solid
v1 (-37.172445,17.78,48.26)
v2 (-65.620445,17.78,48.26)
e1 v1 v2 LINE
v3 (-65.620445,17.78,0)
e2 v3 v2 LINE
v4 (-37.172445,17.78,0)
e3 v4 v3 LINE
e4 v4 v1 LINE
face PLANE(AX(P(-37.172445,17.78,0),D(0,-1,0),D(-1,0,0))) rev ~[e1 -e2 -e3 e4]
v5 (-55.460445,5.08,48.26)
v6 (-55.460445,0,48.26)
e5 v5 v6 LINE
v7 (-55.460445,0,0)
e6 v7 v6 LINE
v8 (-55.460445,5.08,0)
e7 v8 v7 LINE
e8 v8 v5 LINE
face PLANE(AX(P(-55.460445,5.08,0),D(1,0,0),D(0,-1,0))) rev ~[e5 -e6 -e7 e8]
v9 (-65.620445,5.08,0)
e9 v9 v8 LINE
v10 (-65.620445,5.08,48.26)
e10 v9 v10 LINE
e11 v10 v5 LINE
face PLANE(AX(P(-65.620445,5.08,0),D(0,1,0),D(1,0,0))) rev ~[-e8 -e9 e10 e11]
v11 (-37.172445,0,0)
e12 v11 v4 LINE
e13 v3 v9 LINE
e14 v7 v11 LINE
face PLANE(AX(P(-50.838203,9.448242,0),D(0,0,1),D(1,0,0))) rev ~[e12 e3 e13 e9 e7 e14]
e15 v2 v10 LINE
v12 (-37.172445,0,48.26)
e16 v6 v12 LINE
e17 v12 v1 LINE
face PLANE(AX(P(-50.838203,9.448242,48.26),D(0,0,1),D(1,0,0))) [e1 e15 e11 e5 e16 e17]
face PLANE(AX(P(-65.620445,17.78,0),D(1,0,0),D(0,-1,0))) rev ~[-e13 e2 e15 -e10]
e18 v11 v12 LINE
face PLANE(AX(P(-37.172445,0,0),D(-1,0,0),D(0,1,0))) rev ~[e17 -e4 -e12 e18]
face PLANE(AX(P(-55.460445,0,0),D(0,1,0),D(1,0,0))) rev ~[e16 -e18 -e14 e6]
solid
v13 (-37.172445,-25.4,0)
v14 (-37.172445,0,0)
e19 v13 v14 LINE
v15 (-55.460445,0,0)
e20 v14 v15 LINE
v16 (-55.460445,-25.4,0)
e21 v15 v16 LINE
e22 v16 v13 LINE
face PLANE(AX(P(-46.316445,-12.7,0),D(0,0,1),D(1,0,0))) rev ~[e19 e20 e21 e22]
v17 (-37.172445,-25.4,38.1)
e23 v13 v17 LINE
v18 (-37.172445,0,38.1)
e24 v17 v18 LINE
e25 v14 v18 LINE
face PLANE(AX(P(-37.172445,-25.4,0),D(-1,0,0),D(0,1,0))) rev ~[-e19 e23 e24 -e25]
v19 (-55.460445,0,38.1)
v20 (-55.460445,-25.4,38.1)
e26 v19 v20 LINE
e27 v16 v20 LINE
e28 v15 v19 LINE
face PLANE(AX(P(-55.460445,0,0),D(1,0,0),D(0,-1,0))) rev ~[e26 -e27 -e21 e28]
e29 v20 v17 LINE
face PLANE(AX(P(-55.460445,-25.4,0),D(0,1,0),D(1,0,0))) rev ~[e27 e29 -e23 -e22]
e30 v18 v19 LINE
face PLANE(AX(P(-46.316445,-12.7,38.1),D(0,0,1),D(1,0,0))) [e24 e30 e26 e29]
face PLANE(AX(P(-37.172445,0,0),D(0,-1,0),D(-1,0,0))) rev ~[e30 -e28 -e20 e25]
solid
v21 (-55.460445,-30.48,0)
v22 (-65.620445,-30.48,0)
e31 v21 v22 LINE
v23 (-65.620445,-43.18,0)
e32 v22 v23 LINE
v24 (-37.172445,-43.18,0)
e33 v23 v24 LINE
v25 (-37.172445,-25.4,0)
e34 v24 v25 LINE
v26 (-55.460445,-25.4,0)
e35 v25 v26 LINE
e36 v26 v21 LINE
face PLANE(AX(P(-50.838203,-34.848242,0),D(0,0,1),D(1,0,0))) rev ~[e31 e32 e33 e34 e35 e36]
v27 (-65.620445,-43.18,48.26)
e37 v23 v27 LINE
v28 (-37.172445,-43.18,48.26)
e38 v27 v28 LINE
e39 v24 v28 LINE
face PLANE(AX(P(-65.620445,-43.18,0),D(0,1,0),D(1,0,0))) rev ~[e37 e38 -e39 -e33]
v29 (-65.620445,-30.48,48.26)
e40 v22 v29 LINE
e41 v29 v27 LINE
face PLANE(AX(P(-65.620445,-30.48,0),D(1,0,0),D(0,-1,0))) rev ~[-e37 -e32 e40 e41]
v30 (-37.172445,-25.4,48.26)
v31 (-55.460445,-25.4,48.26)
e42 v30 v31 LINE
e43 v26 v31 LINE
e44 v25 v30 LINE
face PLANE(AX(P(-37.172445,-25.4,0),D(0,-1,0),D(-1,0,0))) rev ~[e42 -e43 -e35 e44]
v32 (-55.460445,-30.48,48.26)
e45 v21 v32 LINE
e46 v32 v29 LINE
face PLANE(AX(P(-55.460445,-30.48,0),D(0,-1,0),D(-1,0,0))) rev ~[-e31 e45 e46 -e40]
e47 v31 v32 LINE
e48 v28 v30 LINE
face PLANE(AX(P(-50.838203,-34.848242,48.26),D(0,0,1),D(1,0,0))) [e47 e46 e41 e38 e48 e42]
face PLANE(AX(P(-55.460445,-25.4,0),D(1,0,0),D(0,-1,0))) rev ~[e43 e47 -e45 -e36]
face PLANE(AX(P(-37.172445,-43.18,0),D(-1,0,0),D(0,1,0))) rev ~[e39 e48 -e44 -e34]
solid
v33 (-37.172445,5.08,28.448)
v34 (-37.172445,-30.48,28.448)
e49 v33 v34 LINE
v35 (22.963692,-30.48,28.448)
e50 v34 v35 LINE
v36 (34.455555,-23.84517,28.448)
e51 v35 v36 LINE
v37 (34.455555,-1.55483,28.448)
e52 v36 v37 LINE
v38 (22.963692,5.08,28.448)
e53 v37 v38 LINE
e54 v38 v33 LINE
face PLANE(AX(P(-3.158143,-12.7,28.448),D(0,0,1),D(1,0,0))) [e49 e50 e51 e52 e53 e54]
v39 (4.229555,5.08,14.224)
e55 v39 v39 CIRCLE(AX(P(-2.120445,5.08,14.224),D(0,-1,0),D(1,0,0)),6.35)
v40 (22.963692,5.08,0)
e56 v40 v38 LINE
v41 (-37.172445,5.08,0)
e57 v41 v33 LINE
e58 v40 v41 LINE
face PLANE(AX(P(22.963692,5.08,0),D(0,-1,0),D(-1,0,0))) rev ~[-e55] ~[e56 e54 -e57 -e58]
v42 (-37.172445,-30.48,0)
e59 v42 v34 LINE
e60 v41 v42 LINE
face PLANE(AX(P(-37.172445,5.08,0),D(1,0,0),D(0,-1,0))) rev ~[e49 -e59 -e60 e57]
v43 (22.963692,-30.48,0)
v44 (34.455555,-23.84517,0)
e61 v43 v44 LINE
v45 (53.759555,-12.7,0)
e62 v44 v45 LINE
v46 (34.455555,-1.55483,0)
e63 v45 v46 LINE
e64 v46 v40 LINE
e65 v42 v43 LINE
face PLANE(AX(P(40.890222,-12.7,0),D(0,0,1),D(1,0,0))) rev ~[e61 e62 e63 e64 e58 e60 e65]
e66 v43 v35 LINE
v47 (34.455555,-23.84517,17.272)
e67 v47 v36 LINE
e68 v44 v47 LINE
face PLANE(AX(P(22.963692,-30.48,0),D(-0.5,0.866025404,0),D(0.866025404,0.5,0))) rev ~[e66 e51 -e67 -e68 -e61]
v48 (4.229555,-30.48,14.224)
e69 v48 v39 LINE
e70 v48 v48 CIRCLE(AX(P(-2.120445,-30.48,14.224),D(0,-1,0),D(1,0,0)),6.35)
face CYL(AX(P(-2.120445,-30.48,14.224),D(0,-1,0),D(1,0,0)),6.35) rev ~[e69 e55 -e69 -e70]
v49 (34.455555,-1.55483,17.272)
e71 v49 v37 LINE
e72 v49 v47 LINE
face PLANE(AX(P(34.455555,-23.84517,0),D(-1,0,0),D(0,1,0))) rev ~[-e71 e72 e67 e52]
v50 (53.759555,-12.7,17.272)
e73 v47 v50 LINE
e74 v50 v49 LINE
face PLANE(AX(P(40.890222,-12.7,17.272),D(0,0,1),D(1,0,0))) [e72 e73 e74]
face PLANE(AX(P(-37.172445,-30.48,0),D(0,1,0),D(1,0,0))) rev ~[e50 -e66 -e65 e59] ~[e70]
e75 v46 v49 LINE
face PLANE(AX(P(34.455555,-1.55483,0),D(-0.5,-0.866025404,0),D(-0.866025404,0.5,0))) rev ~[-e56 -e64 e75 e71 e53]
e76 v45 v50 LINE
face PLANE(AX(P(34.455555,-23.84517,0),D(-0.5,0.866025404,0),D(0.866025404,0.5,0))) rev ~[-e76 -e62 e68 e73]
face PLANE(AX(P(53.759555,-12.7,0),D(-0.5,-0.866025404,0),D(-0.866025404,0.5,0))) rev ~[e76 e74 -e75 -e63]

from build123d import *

# Parameters (mm, degrees)
F1_DEPTH = 48.26
F2_DEPTH = 38.1
F3_DEPTH = 28.448
F4_DEPTH = 17.272
F5_R     = 6.35
F6_DEPTH = 71.12


with BuildPart() as f1:
    # F0 (on Top) → F1 (new body)
    with BuildSketch(Plane.XY):
        Polygon((-37.172444715, -25.4), (-55.460444715, -25.4), (-55.460444715, -30.48), (-65.620444715, -30.48), (-65.620444715, -43.18), (-55.460444715, -43.18), (-37.172444715, -43.18), (-37.172444715, -30.48), align=None)
    extrude(amount=F1_DEPTH)


with BuildPart() as f1b:
    # F0 (on Top) → F1, piece 2 (new body)
    with BuildSketch(Plane.XY):
        Polygon((-55.460444715, 17.78), (-65.620444715, 17.78), (-65.620444715, 5.08), (-55.460444715, 5.08), (-55.460444715, 0), (-37.172444715, 0), (-37.172444715, 5.08), (-37.172444715, 17.78), align=None)
    extrude(amount=F1_DEPTH)


with BuildPart() as f2:
    # F0 (on Top) → F2 (new body)
    with BuildSketch(Plane.XY):
        Polygon((-37.172444715, 0), (-55.460444715, 0), (-55.460444715, -25.4), (-37.172444715, -25.4), (-37.172444715, -12.7), align=None)
    extrude(amount=F2_DEPTH)


with BuildPart() as f3:
    # F0 (on Top) → F3 (new body)
    with BuildSketch(Plane.XY):
        Polygon((22.9636919264, 5.08), (-37.172444715, 5.08), (-37.172444715, 0), (-37.172444715, -12.7), (-37.172444715, -25.4), (-37.172444715, -30.48), (22.9636919264, -30.48), (34.455555285, -23.8451695964), (34.455555285, -12.7), (34.455555285, -1.5548304036), align=None)
    extrude(amount=F3_DEPTH)

    # F0 (on Top) → F4 (join)
    with BuildSketch(Plane.XY):
        Polygon((53.759555285, -12.7), (34.455555285, -1.5548304036), (34.455555285, -12.7), (34.455555285, -23.8451695964), align=None)
    extrude(amount=F4_DEPTH)

    # F5 (on face) → F6 (cut)
    with BuildSketch(Plane.XZ.offset(30.48)):
        with Locations((-2.120444715, 14.224)):
            Circle(F5_R)
    extrude(amount=-F6_DEPTH, mode=Mode.SUBTRACT)


solid = Compound([f1.part, f1b.part, f2.part, f3.part])
